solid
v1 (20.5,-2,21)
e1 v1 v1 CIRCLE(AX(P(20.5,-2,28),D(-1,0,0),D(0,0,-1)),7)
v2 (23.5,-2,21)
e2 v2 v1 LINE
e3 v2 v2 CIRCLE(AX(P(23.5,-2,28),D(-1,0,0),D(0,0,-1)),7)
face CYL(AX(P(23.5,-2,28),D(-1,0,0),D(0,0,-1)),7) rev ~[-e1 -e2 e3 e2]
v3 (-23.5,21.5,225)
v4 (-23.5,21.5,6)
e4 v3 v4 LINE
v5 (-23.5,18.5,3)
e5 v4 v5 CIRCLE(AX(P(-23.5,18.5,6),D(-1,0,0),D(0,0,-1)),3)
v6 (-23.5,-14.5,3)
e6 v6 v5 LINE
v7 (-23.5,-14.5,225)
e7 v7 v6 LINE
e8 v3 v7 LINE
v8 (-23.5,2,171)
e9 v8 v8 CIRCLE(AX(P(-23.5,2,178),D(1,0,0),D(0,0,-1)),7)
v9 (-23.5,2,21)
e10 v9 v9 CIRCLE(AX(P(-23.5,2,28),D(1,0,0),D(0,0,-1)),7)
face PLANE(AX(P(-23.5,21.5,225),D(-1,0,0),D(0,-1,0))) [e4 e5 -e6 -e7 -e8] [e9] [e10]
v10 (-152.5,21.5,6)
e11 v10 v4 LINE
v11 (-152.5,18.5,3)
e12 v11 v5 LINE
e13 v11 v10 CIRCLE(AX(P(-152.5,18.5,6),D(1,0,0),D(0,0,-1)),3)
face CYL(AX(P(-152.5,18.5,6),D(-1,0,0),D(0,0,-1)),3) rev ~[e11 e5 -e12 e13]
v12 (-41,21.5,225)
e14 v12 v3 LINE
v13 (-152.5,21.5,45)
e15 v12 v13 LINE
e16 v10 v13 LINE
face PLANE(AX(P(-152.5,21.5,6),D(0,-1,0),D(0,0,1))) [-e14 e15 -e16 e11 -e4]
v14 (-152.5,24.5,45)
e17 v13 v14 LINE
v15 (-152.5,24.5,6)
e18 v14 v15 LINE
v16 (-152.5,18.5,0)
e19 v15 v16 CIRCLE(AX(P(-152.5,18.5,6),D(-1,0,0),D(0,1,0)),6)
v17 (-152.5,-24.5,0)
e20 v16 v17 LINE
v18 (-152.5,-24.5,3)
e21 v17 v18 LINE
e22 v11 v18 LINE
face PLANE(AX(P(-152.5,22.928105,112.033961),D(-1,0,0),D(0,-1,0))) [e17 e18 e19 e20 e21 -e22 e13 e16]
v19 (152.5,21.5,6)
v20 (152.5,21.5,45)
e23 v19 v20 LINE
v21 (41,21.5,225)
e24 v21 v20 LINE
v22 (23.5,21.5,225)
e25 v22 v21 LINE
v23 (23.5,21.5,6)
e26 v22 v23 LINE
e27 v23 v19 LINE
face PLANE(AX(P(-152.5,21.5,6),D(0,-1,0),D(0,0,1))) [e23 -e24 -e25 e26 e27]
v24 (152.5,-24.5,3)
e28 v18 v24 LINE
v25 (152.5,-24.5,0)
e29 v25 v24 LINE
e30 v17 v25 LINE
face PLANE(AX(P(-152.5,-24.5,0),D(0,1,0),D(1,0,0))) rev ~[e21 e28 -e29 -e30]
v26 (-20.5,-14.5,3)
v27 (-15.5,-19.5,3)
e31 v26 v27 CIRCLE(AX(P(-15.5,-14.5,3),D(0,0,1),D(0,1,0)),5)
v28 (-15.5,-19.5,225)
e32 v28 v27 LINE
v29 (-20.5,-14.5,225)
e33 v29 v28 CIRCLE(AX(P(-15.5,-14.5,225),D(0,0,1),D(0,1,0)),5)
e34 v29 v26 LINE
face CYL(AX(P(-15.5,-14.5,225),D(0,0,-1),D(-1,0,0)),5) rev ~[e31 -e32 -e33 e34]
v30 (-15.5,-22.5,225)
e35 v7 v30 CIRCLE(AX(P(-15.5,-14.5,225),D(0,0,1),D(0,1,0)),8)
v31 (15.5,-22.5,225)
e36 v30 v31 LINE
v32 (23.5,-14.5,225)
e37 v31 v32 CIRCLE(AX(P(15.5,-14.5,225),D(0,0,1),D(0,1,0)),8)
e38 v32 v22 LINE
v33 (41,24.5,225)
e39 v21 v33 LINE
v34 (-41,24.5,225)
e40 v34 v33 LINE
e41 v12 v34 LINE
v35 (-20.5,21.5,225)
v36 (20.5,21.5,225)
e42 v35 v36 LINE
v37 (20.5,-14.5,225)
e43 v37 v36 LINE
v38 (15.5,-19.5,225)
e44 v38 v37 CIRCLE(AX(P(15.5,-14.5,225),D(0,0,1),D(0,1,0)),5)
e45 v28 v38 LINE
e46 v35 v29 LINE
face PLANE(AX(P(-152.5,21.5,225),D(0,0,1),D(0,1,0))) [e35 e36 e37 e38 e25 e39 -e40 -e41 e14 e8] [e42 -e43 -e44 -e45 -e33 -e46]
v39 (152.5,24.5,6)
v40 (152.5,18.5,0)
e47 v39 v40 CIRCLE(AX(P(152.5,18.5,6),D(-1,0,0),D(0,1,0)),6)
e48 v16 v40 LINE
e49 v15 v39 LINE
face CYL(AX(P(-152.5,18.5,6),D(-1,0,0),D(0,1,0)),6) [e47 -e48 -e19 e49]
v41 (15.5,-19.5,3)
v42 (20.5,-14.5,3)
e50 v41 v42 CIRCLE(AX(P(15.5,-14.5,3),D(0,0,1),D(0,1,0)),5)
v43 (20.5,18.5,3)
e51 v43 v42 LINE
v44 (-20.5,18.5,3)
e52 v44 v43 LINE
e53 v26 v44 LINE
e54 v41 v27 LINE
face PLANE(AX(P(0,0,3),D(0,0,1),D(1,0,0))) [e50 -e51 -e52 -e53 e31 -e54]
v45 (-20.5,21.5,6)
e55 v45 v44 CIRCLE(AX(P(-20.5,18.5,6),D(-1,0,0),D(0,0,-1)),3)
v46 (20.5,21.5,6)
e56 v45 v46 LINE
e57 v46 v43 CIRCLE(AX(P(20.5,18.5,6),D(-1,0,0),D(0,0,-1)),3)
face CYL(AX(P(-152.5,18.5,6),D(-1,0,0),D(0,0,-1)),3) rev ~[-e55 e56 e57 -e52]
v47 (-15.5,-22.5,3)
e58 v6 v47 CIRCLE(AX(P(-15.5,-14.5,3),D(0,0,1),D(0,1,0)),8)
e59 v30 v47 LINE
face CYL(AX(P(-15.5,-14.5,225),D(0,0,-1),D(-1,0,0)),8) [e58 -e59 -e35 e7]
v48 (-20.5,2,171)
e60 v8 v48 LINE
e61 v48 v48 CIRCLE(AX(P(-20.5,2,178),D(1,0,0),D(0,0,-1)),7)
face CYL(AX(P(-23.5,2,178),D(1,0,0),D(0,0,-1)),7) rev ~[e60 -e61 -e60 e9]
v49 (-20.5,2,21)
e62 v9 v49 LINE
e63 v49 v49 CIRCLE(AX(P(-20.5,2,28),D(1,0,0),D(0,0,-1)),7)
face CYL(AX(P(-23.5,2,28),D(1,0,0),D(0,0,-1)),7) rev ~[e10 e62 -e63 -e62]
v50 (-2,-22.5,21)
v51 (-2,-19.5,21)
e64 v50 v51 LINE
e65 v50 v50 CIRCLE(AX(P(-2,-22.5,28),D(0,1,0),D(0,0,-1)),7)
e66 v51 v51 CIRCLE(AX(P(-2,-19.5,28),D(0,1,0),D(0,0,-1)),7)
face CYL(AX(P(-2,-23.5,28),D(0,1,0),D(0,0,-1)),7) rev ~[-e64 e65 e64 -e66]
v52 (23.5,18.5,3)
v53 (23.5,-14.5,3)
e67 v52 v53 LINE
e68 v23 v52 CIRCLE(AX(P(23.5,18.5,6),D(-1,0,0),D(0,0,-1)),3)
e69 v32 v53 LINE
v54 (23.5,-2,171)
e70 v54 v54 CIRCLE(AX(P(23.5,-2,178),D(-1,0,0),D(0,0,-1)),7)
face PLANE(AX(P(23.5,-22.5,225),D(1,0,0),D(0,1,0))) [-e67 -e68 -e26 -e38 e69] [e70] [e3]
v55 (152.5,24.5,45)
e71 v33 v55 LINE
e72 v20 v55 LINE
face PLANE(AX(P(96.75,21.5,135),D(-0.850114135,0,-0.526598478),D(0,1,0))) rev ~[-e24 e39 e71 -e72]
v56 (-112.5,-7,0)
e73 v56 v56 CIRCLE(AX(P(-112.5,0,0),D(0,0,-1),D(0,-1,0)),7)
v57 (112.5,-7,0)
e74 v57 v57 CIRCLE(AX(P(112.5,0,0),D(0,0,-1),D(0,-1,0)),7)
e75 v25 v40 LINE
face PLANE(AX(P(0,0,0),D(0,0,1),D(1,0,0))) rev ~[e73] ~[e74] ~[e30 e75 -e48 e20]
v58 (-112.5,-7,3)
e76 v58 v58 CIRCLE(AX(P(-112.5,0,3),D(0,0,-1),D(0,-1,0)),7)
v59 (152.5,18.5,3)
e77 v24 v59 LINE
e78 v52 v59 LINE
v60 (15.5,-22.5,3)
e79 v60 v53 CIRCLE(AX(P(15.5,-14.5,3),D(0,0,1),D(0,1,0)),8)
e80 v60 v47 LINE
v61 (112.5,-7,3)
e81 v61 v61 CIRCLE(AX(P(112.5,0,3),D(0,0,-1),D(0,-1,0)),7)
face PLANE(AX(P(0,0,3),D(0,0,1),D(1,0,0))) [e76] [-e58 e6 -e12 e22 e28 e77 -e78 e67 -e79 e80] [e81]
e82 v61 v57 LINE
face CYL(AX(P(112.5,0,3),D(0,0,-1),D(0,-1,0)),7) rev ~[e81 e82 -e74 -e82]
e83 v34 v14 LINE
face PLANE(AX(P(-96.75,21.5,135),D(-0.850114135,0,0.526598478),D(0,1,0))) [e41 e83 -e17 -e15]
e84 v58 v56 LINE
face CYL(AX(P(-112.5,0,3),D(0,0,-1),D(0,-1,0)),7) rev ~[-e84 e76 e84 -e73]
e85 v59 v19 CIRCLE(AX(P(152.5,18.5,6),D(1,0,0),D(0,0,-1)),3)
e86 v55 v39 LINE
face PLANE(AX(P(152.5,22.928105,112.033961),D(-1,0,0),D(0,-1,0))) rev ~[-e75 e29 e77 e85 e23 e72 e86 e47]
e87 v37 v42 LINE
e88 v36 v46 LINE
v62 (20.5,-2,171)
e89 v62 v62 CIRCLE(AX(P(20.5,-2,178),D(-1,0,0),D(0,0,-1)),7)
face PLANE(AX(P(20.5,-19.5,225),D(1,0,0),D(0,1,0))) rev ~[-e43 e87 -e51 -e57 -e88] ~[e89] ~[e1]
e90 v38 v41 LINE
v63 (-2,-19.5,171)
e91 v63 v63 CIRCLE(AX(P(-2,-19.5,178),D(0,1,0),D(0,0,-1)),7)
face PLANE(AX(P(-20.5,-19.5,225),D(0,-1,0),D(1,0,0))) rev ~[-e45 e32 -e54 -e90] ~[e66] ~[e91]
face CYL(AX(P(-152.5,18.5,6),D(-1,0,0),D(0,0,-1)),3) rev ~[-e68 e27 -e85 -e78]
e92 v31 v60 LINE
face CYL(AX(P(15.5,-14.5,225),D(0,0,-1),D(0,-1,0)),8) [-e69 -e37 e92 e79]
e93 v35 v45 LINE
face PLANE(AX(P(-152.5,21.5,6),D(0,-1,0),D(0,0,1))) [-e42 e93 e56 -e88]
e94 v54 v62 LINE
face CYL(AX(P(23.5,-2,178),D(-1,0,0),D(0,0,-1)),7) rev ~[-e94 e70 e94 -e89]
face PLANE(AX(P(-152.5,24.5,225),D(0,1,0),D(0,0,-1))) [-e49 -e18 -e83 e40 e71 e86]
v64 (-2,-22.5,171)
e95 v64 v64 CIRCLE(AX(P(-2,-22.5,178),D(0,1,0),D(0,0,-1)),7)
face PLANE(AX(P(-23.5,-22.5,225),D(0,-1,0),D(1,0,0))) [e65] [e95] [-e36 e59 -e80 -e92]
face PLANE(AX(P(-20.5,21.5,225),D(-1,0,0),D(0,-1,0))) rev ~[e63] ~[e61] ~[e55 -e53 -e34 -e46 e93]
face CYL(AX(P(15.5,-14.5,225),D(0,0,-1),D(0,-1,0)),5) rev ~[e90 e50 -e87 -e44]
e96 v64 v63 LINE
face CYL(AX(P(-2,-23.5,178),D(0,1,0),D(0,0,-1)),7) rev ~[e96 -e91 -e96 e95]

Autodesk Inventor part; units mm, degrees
ref_plane "YZ Plane" through (0, 0, 0) normal (1, 0, 0) x (0, 1, 0)
ref_plane "XZ Plane" through (0, 0, 0) normal (0, 1, 0) x (-1, 0, 0)
ref_plane "XY Plane" through (0, 0, 0) normal (0, 0, 1) x (1, 0, 0)
sketch "Sketch1" plane through (0, 0, 0) normal (0, 0, 1) x (1, 0, 0)
  line L0 (-152.5, -24.5) -> (152.5, -24.5)
  line L1 (152.5, -24.5) -> (152.5, 24.5)
  line L2 (152.5, 24.5) -> (-152.5, 24.5)
  line L3 (-152.5, 24.5) -> (-152.5, -24.5)
  point P0 (0, 24.5)
  point P1 (0, 0)
  point P2 (-152.5, 0)
  point P3 (0, -24.5)
  dimension "d0" = 305
  dimension "d1" = 49
extrude "Plate1" add sketch "Sketch1" along normal blind 3
sketch "Sketch2" plane through (152.5, 21.5, 0) normal (0, 1, 0) x (-1, 0, 0)
  line L0 (305, 0) -> (0, 0)
  line L1 (0, 0) -> (0, -225)
  line L2 (0, -225) -> (305, -225)
  line L3 (305, -225) -> (305, 0)
edge flange "Flange1" height 225 angle 90 thickness 3 bend radius 3 thickness toward (0, 1, 0) relief tear relief width 3 relief depth 1.5 edges at (0, 24.5, 0) wall of the first edge with corners at (-152.5, 21.5, 0) (152.5, 21.5, 0) (152.5, 21.5, 225) (-152.5, 21.5, 225)
bend "Bend1"
corner "Corner1"
chamfer "Corner Chamfer1" distance 111.5 distance2 180 1 edges at (152.5, 23, 225) measured on face at (-50.8333, 22.5, 225)
chamfer "Corner Chamfer2" distance 111.5 distance2 180 1 edges at (-152.5, 23, 225) measured on face at (-88, 22.5, 225)
sketch "Sketch4" plane through (0, 0, 3) normal (0, 0, 1) x (1, 0, 0)
  line L0 (152.5, -24.5) -> (-152.5, -24.5) projected
  line L1 (-112.5, 0) -> (112.5, 0)
  point P0 (0, 0)
  point P1 (0, 0)
  point P2 (0, -24.5)
  dimension "d26" = 225
  dimension "d27" = 24.5
hole "Hole1" at (-112.5, 0, 3) direction (0, 0, -1) diameter 14 end through all
pattern_linear "Rectangular Pattern1" count 2 spacing 225 along (1, 0, 0) of "Hole1"
sketch "Sketch3" plane through (-41, 21.5, 225) normal (0, 0, 1) x (1, 0, 0)
  line L0 (0, 0) -> (82, 0) projected
  line L1 (20.5, -41) -> (61.5, -41)
  line L2 (61.5, -41) -> (61.5, 0)
  line L3 (61.5, 0) -> (20.5, 0)
  line L4 (20.5, 0) -> (20.5, -41)
  line L5 (17.5, 0) -> (17.5, -44)
  line L6 (17.5, -44) -> (64.5, -44)
  line L7 (64.5, -44) -> (64.5, 0)
  point P0 (41, -21.5)
  point P1 (41, 0)
  dimension "d19" = 41
  dimension "d20" = 41
  dimension "d21" = 3
  dimension "d22" = 3
  dimension "d23" = 3
extrude "Extrusion1" add sketch "Sketch3" against normal up to next contours L0 L4 L1 L2 L7 L6 L5
fillet "Fillet1" radius 5 2 edges at (-20.5, -19.5, 114) (20.5, -19.5, 114)
fillet "Fillet1" radius 8 2 edges at (-23.5, -22.5, 114) (23.5, -22.5, 114)
hole "Hole2" at (23.5, -2, 28) direction (-1, 0, 0) diameter 14 depth 20 tip angle 118
pattern_linear "Rectangular Pattern2" count 2 spacing 150 along (0, 0, 1) of "Hole2"
pattern_circular "Circular Pattern1" count 3 over 180 about axis through (0, 0, -10) along (0, 0, -1) of "Hole2", "Rectangular Pattern2"
equation "\"d33\" = Thickness"
equation "\"d37\" = d26"
equation "\"d20\" = d19"
equation "\"d21\" = Thickness"
equation "\"d22\" = Thickness"
equation "\"d23\" = Thickness"
equation "\"d55\" = Thickness"
equation "\"d3\" = BendReliefWidth"
equation "\"d4\" = BendReliefDepth"
equation "\"d5\" = MinimumRemnant"
equation "\"d6\" = BendRadius"
equation "\"d9\" = BendRadius"
equation "\"d10\" = CornerReliefSize"
equation "\"d11\" = GapSize"
equation "\"d12\" = JacobiRadiusSize"
equation "\"BendRadius\" = Thickness"
equation "\"BendReliefWidth\" = Thickness"
equation "\"BendReliefDepth\" = 0.5 * Thickness"
equation "\"CornerReliefSize\" = 4 * Thickness"
equation "\"MinimumRemnant\" = 2 * Thickness"
equation "\"TransitionRadius\" = BendRadius"
equation "\"JacobiRadiusSize\" = BendRadius"
equation "\"GapSize\" = Thickness"
equation "\"d2\" = BendRadius"
equation "\"Thickness\" = 3"
properties part number "P2348-S1-Unistrut"
